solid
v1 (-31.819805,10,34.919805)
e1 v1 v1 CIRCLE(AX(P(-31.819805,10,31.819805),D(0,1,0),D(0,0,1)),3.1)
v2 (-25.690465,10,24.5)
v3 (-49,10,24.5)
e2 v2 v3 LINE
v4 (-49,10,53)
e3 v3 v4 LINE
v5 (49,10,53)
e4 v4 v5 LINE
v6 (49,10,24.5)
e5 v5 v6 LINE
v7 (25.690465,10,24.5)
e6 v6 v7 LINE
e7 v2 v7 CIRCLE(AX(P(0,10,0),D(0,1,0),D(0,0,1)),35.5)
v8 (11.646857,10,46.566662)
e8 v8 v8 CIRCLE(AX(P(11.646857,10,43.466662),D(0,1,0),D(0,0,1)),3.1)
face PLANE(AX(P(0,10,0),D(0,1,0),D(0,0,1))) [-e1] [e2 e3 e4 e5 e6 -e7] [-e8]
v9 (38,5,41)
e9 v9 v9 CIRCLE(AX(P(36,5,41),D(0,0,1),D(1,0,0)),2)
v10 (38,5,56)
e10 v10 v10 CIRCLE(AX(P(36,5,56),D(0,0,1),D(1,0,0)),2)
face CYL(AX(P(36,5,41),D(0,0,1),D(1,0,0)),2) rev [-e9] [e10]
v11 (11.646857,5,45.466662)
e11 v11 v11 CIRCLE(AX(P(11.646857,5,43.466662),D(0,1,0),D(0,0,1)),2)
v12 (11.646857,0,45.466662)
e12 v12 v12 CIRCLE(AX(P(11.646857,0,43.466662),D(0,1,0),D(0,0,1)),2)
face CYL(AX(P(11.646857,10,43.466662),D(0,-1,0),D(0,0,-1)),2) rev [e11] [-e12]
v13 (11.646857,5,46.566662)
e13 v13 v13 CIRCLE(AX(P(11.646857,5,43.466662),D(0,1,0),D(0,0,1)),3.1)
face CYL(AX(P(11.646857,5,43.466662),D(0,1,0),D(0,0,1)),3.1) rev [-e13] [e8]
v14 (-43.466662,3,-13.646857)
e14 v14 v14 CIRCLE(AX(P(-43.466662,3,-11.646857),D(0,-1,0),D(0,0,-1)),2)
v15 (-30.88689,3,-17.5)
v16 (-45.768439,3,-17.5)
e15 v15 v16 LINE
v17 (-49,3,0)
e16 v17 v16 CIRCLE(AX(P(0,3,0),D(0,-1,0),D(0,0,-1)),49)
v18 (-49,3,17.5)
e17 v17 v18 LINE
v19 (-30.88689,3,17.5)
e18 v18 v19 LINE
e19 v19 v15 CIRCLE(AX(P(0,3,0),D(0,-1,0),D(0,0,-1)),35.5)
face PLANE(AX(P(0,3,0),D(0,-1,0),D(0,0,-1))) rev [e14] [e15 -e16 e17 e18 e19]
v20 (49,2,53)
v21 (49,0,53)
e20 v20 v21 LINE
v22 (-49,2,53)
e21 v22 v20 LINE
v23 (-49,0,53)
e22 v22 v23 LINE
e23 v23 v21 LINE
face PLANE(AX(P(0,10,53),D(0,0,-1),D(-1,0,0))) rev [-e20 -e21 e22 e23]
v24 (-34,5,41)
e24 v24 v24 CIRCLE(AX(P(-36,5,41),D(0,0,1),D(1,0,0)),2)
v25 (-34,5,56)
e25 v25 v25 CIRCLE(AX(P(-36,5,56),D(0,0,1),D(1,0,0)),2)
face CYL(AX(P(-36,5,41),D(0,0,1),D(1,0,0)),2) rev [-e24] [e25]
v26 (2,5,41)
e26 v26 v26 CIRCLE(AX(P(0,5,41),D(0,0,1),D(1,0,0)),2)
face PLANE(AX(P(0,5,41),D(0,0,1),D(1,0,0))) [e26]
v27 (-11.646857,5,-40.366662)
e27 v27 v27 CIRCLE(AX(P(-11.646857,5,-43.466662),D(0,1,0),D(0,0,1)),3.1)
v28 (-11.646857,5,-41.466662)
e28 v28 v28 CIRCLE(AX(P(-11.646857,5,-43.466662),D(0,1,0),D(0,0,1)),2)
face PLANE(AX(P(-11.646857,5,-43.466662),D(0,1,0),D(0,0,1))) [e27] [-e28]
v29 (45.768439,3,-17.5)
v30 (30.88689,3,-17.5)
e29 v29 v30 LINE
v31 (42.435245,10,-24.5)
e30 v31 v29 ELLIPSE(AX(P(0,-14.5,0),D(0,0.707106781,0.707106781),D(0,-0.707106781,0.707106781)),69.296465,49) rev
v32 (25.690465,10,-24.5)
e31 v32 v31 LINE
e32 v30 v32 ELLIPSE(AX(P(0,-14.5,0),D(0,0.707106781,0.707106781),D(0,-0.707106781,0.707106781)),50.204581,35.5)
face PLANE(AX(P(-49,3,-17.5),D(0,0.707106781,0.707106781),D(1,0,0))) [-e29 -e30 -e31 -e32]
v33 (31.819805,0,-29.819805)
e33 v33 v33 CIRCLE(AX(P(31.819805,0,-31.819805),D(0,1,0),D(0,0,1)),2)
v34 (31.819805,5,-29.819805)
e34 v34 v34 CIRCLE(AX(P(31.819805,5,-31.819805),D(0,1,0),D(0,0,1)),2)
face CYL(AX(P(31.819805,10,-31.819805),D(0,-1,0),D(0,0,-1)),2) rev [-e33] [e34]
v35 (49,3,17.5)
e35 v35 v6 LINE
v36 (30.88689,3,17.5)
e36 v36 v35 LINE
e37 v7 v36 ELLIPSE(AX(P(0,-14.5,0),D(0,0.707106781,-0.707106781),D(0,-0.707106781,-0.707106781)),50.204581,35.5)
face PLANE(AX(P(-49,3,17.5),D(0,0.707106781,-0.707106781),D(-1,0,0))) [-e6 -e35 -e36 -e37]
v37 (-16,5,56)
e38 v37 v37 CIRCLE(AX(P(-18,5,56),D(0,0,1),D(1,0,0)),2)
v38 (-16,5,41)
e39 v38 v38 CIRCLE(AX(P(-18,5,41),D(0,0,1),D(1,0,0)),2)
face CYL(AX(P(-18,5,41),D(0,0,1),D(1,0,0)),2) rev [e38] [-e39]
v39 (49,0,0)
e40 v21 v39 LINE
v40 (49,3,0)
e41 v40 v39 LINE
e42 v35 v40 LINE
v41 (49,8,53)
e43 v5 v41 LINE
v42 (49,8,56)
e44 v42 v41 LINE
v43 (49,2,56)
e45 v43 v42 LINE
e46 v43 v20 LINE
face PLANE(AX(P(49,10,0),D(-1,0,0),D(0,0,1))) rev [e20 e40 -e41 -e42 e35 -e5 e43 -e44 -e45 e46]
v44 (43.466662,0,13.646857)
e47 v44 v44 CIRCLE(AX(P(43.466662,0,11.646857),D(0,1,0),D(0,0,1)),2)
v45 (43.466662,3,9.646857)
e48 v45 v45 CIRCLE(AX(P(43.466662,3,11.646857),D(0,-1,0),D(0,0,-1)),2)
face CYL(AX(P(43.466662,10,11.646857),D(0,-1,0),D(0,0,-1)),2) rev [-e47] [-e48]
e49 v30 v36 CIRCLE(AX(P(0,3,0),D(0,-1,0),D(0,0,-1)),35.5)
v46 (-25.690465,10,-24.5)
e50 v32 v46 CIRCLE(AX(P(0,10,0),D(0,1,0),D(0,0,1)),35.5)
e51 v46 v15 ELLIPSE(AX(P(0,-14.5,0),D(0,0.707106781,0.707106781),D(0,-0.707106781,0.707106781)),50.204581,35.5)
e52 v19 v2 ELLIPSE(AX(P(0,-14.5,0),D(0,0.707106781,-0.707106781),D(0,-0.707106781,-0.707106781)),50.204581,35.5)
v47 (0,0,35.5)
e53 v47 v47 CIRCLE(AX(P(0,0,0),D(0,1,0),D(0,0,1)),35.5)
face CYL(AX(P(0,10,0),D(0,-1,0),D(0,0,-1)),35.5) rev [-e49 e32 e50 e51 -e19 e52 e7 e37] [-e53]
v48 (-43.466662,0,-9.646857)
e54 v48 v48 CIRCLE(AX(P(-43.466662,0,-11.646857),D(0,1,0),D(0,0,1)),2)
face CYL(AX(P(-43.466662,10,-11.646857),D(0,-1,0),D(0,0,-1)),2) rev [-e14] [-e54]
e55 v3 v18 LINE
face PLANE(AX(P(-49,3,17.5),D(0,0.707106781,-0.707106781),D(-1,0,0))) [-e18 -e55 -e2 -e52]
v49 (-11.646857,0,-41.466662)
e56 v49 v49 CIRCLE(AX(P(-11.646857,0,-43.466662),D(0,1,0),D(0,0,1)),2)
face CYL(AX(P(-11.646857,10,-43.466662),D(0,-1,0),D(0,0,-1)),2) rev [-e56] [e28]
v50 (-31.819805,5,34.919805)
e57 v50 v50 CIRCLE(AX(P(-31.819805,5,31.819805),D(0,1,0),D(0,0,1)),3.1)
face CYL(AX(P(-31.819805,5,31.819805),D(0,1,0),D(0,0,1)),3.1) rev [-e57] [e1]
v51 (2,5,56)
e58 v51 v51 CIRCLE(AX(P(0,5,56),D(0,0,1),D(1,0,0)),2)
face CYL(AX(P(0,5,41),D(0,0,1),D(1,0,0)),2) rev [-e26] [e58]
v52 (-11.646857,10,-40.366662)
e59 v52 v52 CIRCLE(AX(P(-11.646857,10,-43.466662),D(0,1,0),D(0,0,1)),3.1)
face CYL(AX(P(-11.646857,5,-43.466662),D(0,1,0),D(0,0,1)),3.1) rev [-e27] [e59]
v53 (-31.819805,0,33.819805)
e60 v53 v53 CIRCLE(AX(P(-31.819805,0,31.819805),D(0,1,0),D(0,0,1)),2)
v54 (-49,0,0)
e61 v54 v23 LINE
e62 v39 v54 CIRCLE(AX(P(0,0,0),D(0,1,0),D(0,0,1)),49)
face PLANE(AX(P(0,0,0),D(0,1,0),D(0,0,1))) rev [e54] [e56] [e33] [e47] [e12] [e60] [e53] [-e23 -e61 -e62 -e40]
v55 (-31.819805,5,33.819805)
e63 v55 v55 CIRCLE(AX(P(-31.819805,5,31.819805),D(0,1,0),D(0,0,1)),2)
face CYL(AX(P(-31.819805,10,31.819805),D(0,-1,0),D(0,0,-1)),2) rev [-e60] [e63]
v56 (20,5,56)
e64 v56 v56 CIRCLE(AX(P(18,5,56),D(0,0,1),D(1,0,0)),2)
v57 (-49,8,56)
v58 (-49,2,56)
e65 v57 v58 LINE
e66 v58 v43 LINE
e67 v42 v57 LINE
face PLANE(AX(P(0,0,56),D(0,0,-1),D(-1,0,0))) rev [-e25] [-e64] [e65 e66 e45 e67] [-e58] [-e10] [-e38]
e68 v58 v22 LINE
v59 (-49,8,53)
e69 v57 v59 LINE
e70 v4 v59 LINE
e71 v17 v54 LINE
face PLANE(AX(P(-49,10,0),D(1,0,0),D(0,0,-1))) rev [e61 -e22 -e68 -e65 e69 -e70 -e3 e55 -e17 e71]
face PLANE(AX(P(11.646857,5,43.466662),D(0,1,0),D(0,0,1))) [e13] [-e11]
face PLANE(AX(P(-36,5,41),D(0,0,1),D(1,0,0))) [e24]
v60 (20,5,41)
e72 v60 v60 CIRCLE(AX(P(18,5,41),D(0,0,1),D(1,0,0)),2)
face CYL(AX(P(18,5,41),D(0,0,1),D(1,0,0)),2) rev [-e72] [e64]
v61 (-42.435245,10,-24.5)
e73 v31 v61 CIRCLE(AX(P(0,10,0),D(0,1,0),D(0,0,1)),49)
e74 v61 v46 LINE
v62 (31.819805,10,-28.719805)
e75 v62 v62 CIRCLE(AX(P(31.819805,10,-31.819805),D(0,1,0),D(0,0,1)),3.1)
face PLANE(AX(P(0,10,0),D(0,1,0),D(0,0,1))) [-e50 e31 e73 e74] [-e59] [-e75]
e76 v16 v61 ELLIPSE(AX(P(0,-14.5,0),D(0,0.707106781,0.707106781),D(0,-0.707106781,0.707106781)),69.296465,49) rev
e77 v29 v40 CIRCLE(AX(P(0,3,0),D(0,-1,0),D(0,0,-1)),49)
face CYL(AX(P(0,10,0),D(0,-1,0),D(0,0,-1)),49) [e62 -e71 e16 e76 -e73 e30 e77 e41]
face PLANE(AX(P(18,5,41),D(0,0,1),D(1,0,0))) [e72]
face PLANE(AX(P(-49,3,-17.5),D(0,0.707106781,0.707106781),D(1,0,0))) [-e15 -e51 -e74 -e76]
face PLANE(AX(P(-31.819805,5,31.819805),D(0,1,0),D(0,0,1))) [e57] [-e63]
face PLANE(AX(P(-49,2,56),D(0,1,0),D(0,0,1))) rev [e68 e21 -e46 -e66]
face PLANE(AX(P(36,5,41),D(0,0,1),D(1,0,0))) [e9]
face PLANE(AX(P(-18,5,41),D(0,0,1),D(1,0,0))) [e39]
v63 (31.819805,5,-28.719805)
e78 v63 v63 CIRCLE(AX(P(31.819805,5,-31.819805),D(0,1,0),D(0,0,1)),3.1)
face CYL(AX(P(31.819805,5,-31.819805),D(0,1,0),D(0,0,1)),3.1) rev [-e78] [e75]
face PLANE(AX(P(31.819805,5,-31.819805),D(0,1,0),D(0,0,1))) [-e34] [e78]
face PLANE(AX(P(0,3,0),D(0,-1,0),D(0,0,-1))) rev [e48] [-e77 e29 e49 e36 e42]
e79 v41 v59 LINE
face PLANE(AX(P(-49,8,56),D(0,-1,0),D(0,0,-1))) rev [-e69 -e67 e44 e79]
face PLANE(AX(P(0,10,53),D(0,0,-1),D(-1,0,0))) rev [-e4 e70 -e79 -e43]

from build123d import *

# Parameters (mm, degrees)
SKETCH_1_R           = 35.5
SKETCH_1_R_2         = 2
EXTRUDE_4_DEPTH      = 10
SKETCH_24_W          = 98
SKETCH_24_H          = 6
EXTRUDE_5_DEPTH      = 3
SKETCH_26_W          = 98
SKETCH_26_H          = 35
CUT_EXTRUDE_17_DEPTH = 7
CHAMFER_1_SIZE       = 7
SKETCH_27_R          = 3.1
CUT_EXTRUDE_18_DEPTH = 5
SKETCH_28_R          = 2
CUT_EXTRUDE_19_DEPTH = 15


with BuildPart() as part:
    # 스케치1 → 보스-돌출4 (new body)
    with BuildSketch(Plane(origin=(0, 0, 0), x_dir=(1, 0, 0), z_dir=(0, 1, 0))):
        with BuildLine():
            Line((-49, 0), (-49, -53))
            Line((-49, -53), (49, -53))
            Line((49, -53), (49, 0))
            ThreePointArc((49, 0), (0, 49), (-49, 0))
        make_face()
        with Locations(Location((0, 0, 0), (0, 0, 270))):
            Circle(SKETCH_1_R, mode=Mode.SUBTRACT)
        with Locations(Location((-43.466662183, 11.64685703, 0), (0, 0, 270))):
            Circle(SKETCH_1_R_2, mode=Mode.SUBTRACT)
        with Locations(Location((-11.64685703, 43.466662183, 0), (0, 0, 270))):
            Circle(SKETCH_1_R_2, mode=Mode.SUBTRACT)
        with Locations(Location((31.819805153, 31.819805153, 0), (0, 0, 270))):
            Circle(SKETCH_1_R_2, mode=Mode.SUBTRACT)
        with Locations(Location((43.466662183, -11.64685703, 0), (0, 0, 270))):
            Circle(SKETCH_1_R_2, mode=Mode.SUBTRACT)
        with Locations(Location((11.64685703, -43.466662183, 0), (0, 0, 270))):
            Circle(SKETCH_1_R_2, mode=Mode.SUBTRACT)
        with Locations(Location((-31.819805153, -31.819805153, 0), (0, 0, 270))):
            Circle(SKETCH_1_R_2, mode=Mode.SUBTRACT)
    extrude(amount=EXTRUDE_4_DEPTH)

    # 스케치24 → 보스-돌출5 (add)
    with BuildSketch(Plane.XY.offset(53)):
        with Locations((0, 5)):
            Rectangle(SKETCH_24_W, SKETCH_24_H)
    extrude(amount=EXTRUDE_5_DEPTH)

    # 스케치26 → 컷-돌출17 (cut)
    with BuildSketch(Plane(origin=(0, 10, 0), x_dir=(1, 0, 0), z_dir=(0, 1, 0))):
        Rectangle(SKETCH_26_W, SKETCH_26_H)
    extrude(amount=-CUT_EXTRUDE_17_DEPTH, mode=Mode.SUBTRACT)

    # 모따기1
    chamfer_1_edges = [part.edges().sort_by_distance(p)[0] for p in [
        (-39.943445211, 10, 17.5),
        (39.943445211, 10, 17.5),
        (38.327664665, 10, -17.5),
        (-38.327664665, 10, -17.5),
    ]]
    chamfer(chamfer_1_edges, length=CHAMFER_1_SIZE - 0.0001)  # a hair under: the kernel refuses the full size

    # 스케치27 → 컷-돌출18 (cut)
    with BuildSketch(Plane(origin=(0, 10, 0), x_dir=(1, 0, 0), z_dir=(0, 1, 0))):
        with Locations(Location((-11.64685703, 43.466662183, 0), (0, 0, 270))):
            Circle(SKETCH_27_R)
        with Locations(Location((31.819805153, 31.819805153, 0), (0, 0, 270))):
            Circle(SKETCH_27_R)
        with Locations((43.466662183, -11.64685703)):
            Circle(SKETCH_27_R)
        with Locations(Location((11.64685703, -43.466662183, 0), (0, 0, 270))):
            Circle(SKETCH_27_R)
        with Locations(Location((-31.819805153, -31.819805153, 0), (0, 0, 270))):
            Circle(SKETCH_27_R)
        with Locations((-43.466662183, 11.64685703)):
            Circle(SKETCH_27_R)
    extrude(amount=-CUT_EXTRUDE_18_DEPTH, mode=Mode.SUBTRACT)

    # 스케치28 → 컷-돌출19 (cut)
    with BuildSketch(Plane.XY.offset(56)):
        with Locations((-36, 5)):
            Circle(SKETCH_28_R)
        with Locations((-18, 5)):
            Circle(SKETCH_28_R)
        with Locations((0, 5)):
            Circle(SKETCH_28_R)
        with Locations((18, 5)):
            Circle(SKETCH_28_R)
        with Locations((36, 5)):
            Circle(SKETCH_28_R)
    extrude(amount=-CUT_EXTRUDE_19_DEPTH, mode=Mode.SUBTRACT)


solid = part.part
